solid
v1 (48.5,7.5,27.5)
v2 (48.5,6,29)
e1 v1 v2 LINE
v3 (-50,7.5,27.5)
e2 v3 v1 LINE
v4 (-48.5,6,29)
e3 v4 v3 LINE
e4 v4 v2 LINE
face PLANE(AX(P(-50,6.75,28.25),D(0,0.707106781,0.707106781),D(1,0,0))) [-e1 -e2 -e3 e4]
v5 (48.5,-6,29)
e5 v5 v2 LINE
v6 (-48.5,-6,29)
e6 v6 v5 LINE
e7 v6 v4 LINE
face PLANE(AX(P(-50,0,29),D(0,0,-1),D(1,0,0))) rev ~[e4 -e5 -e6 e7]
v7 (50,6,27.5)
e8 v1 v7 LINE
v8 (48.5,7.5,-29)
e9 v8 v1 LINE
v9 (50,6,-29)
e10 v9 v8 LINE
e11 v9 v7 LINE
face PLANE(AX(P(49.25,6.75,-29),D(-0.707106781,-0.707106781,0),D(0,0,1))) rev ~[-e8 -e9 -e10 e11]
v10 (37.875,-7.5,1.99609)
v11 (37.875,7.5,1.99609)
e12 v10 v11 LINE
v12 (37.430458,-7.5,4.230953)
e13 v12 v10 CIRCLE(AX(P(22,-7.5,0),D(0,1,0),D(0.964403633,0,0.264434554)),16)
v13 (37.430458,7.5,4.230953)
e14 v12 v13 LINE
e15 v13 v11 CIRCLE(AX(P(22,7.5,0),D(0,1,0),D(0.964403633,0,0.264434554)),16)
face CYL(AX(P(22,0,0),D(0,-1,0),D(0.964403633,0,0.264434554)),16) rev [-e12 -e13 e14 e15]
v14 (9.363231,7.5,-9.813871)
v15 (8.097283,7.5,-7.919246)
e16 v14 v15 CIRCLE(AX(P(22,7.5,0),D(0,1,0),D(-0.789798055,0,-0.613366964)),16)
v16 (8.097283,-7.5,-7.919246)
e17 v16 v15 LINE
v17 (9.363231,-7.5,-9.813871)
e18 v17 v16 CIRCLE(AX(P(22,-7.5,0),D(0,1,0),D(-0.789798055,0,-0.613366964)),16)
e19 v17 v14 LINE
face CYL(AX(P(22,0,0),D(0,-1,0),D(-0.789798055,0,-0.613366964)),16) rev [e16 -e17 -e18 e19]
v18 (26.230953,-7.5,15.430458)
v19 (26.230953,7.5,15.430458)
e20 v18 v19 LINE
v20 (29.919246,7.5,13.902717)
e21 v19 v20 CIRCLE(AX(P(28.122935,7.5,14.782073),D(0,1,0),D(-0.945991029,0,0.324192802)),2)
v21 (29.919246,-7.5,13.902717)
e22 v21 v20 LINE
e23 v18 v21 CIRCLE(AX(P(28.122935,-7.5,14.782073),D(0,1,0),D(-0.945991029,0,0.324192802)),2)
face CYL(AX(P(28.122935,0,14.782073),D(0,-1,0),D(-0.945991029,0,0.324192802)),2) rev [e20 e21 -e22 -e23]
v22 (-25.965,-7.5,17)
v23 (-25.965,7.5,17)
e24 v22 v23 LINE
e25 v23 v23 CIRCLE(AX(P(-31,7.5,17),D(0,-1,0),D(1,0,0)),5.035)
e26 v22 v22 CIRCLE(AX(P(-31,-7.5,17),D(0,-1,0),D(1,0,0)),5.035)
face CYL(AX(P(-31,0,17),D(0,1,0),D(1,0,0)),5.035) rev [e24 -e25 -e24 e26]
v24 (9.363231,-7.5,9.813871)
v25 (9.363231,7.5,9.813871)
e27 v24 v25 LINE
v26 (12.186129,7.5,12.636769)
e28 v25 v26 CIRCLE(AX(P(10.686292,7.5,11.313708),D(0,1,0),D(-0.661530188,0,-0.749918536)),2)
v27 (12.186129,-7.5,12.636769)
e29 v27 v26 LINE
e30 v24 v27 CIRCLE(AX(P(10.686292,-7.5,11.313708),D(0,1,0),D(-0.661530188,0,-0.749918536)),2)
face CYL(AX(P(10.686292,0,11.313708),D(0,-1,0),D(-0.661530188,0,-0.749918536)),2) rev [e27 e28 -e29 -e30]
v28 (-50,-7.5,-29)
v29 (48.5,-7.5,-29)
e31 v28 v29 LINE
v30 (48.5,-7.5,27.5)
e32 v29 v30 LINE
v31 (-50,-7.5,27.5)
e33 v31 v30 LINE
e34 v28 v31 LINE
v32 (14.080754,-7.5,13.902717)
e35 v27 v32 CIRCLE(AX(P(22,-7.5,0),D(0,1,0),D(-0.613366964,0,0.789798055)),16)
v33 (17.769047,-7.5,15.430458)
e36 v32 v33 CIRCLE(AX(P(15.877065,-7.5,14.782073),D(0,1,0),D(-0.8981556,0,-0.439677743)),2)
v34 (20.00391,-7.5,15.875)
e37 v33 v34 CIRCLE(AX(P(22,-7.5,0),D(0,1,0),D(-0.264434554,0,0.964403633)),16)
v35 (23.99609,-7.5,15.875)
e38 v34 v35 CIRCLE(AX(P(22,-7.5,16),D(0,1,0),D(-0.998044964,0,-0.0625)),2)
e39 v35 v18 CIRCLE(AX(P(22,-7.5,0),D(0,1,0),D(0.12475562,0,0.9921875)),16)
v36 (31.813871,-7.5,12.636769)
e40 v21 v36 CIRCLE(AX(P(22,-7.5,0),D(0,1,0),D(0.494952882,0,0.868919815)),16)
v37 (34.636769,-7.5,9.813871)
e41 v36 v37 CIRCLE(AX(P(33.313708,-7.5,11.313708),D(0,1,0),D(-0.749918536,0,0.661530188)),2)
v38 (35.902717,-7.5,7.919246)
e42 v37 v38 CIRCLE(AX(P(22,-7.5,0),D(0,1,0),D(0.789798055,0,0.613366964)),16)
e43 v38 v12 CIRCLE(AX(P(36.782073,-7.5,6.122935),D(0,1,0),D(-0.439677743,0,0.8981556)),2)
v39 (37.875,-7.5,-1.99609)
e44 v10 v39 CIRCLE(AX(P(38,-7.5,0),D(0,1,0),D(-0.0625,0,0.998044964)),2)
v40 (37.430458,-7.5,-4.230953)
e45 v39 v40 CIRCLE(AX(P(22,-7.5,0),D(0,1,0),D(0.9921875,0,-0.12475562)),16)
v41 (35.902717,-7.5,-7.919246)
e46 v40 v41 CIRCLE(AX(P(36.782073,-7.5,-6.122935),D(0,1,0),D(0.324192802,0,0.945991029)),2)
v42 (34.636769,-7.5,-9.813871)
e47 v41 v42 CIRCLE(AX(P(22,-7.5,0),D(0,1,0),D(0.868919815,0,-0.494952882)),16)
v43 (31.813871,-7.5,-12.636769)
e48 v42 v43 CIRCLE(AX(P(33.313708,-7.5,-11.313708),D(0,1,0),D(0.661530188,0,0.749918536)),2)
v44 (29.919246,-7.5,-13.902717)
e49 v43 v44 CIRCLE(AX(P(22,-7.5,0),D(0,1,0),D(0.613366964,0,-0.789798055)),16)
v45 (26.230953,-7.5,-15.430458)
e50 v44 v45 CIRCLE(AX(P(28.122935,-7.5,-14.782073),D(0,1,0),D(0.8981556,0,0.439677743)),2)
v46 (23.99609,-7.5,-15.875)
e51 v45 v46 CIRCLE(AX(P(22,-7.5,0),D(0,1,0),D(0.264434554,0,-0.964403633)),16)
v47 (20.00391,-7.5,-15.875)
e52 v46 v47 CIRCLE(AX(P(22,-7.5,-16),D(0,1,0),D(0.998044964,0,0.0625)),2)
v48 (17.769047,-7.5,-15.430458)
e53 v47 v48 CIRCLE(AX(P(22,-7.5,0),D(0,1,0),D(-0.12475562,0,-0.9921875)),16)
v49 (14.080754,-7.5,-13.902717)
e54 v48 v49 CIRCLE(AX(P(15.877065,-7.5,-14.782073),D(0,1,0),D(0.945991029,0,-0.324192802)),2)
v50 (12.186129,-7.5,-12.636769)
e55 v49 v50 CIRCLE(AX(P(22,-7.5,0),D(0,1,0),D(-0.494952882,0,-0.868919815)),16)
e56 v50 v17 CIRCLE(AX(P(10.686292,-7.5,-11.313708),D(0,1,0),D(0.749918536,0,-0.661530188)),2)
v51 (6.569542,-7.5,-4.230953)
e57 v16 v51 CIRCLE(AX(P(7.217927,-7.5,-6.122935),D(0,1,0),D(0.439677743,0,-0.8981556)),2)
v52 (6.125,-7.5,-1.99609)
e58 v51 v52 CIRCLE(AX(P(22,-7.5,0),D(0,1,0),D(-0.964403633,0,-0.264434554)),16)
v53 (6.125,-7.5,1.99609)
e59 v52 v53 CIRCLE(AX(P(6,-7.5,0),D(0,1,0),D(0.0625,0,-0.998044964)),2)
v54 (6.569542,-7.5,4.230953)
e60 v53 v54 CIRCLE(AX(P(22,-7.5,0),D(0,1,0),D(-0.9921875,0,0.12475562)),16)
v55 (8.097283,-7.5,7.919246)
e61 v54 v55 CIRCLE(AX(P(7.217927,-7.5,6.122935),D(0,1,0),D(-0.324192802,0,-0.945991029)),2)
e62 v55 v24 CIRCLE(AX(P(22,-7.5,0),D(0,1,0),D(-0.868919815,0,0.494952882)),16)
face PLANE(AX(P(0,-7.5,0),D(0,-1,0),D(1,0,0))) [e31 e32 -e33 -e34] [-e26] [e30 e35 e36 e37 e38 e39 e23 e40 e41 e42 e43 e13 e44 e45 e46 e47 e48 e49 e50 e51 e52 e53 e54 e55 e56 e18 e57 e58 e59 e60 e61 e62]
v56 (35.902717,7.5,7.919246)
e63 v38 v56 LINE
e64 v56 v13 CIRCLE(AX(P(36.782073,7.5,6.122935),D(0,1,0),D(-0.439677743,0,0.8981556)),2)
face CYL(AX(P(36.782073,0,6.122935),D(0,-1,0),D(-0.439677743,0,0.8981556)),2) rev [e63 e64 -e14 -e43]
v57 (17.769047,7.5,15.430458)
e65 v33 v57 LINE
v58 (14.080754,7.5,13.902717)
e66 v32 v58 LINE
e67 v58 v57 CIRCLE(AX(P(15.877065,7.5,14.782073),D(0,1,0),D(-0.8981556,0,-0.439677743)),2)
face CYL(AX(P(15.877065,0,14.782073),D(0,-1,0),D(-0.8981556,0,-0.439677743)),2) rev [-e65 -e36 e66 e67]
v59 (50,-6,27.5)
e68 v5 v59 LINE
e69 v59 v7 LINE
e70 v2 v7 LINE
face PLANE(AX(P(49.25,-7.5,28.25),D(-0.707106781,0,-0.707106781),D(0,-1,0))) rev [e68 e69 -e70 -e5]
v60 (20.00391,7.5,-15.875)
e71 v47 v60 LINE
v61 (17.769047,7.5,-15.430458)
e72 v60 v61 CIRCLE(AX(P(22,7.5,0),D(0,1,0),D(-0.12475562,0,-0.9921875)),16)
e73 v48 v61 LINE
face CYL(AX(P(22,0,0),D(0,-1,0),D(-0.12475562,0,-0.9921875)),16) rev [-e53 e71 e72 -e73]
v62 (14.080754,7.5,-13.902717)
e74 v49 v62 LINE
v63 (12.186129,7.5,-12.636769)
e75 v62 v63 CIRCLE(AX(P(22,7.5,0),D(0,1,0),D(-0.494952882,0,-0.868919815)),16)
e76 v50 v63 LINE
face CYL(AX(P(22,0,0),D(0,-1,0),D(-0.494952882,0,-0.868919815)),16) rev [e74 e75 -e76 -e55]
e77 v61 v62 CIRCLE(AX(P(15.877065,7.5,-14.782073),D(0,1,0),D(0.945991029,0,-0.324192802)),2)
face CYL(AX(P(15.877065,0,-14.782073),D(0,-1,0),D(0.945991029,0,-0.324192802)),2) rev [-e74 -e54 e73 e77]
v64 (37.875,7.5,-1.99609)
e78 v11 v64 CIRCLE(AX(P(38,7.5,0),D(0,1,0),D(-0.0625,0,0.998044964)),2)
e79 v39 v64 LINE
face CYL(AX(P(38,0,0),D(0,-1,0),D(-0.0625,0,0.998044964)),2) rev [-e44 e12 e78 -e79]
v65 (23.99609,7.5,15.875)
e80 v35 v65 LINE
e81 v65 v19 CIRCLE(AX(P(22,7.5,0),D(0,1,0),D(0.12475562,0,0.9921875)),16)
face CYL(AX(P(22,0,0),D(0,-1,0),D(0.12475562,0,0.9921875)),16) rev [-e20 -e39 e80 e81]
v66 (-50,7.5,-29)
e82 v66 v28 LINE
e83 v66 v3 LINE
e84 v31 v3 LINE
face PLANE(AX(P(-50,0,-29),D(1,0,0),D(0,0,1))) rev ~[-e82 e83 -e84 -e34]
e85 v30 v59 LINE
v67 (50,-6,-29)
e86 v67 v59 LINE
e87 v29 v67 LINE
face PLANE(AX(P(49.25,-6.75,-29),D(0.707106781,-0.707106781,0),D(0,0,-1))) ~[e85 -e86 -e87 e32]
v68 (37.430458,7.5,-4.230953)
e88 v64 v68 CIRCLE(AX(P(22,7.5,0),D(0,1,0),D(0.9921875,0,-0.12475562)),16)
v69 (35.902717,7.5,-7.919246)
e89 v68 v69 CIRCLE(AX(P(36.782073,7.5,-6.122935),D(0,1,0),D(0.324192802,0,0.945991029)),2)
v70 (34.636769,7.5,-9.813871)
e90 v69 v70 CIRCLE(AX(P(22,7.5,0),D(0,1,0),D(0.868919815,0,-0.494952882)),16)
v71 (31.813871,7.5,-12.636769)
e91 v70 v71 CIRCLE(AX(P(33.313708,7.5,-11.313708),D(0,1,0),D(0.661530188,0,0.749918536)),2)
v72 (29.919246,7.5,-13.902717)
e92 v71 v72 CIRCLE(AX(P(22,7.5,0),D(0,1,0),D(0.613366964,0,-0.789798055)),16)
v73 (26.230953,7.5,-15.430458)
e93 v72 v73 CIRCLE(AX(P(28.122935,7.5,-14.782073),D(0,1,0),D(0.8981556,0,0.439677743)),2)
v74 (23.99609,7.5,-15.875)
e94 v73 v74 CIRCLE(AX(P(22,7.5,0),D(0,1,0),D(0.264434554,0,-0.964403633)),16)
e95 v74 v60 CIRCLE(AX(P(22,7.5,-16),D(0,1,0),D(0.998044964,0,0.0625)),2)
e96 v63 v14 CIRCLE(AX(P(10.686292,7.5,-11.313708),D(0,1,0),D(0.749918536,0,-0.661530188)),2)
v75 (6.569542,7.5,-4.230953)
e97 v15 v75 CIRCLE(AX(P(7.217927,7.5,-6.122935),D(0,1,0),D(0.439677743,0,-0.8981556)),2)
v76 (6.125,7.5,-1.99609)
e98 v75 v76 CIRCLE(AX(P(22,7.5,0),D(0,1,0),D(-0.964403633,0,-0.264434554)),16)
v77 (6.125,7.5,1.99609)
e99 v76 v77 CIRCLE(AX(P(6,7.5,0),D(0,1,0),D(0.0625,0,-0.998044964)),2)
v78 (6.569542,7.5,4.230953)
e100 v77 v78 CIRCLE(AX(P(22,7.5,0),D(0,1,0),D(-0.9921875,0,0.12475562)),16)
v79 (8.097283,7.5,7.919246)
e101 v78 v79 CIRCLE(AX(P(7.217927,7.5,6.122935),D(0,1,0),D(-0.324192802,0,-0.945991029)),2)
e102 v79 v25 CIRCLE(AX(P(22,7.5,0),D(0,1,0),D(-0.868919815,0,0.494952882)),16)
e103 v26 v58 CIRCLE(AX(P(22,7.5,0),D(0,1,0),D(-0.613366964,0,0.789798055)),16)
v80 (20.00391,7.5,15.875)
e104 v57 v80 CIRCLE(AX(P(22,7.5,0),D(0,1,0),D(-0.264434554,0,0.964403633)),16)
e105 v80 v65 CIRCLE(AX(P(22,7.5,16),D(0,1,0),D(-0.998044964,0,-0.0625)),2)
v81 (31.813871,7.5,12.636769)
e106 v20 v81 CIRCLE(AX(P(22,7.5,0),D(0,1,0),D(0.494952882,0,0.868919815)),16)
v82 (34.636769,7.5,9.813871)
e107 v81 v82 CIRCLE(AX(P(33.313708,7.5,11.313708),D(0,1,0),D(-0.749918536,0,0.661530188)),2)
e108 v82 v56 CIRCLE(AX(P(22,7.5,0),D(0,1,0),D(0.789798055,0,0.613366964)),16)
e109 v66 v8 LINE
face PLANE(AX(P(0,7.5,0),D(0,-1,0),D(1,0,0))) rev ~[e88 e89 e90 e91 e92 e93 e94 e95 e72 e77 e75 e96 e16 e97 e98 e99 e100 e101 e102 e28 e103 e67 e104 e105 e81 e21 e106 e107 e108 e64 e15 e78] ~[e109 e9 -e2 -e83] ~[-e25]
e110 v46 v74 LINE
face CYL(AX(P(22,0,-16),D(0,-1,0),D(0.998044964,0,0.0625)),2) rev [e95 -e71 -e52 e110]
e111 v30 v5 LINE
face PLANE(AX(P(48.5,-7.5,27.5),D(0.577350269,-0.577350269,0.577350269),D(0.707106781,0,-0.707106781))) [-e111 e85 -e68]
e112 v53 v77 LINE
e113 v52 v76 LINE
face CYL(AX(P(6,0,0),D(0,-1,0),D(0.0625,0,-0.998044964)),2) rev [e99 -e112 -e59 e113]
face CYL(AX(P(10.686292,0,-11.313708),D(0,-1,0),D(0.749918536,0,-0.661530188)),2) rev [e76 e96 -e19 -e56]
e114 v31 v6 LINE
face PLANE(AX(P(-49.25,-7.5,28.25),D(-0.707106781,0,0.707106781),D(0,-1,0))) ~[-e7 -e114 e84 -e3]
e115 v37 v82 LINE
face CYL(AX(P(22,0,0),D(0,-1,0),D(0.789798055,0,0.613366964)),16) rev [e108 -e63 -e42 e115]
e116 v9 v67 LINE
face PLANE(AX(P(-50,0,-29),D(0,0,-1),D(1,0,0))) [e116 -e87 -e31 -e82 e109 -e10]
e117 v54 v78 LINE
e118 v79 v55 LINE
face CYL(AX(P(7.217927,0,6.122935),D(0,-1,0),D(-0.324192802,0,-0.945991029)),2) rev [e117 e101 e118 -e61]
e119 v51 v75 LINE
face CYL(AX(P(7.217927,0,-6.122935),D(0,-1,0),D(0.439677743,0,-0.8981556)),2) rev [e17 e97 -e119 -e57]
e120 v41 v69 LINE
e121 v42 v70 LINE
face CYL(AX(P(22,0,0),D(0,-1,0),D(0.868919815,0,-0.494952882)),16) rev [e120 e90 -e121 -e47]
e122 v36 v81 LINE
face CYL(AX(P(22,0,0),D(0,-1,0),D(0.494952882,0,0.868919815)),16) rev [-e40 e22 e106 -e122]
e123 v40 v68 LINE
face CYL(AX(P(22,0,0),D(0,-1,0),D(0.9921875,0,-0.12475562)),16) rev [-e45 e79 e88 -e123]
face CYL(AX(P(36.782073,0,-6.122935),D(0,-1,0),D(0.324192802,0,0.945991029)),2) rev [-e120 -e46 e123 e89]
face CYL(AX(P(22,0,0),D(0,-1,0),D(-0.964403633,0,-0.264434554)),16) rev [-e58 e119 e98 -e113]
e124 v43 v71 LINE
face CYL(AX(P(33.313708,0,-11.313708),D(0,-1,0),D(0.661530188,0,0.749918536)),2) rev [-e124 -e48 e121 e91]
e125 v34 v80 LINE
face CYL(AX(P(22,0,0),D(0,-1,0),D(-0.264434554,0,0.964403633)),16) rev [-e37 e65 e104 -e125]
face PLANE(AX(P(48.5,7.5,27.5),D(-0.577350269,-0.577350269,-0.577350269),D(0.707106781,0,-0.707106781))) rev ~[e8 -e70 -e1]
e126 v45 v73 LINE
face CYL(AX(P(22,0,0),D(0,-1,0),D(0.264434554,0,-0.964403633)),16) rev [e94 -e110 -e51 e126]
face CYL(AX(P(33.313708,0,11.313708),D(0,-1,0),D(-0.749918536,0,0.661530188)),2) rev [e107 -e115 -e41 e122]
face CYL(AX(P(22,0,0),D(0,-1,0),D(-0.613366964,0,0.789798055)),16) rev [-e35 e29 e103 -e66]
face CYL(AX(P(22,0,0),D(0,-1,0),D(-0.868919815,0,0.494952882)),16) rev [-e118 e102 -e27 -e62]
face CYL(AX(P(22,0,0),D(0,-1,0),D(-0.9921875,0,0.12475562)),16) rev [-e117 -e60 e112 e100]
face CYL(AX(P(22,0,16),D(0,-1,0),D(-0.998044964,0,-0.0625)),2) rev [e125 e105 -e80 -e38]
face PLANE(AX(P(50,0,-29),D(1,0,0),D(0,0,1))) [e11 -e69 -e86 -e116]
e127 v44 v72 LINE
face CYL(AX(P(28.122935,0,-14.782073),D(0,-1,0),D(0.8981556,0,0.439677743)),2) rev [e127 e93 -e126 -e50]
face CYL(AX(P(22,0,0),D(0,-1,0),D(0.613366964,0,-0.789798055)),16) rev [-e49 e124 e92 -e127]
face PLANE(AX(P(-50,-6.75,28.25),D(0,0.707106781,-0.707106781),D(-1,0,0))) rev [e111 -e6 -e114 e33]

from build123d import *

# Parameters (mm, degrees)
F0_W     = 100
F0_H     = 58
F0_R     = 5.035
F1_DEPTH = 7.5
F2_SIZE  = 1.5


with BuildPart() as f1:
    # F0 (on Front) → F1 (new body, symmetric)
    with BuildSketch(Plane.XZ):
        Rectangle(F0_W, F0_H)
        with Locations((-31, 17)):
            Circle(F0_R, mode=Mode.SUBTRACT)
        with BuildLine():
            ThreePointArc((8.0972829663, 7.9192461182), (8.6964862032, 8.8891237283), (9.3632311248, 9.8138714275))
            ThreePointArc((9.3632311248, 9.8138714275), (9.2720779386, 12.7279220614), (12.1861285725, 12.6367688752))
            ThreePointArc((12.1861285725, 12.6367688752), (13.1108762717, 13.3035137968), (14.0807538818, 13.9027170337))
            ThreePointArc((14.0807538818, 13.9027170337), (15.1116982174, 16.6298315852), (17.7690471406, 15.4304581235))
            ThreePointArc((17.7690471406, 15.4304581235), (18.8785548477, 15.6925644865), (20.0039100722, 15.875))
            ThreePointArc((20.0039100722, 15.875), (22, 18), (23.9960899278, 15.875))
            ThreePointArc((23.9960899278, 15.875), (25.1214451523, 15.6925644865), (26.2309528594, 15.4304581235))
            ThreePointArc((26.2309528594, 15.4304581235), (28.8883017826, 16.6298315852), (29.9192461182, 13.9027170337))
            ThreePointArc((29.9192461182, 13.9027170337), (30.8891237283, 13.3035137968), (31.8138714275, 12.6367688752))
            ThreePointArc((31.8138714275, 12.6367688752), (34.7279220614, 12.7279220614), (34.6367688752, 9.8138714275))
            ThreePointArc((34.6367688752, 9.8138714275), (35.3035137968, 8.8891237283), (35.9027170337, 7.9192461182))
            ThreePointArc((35.9027170337, 7.9192461182), (38.6298315852, 6.8883017826), (37.4304581235, 4.2309528594))
            ThreePointArc((37.4304581235, 4.2309528594), (37.6925644865, 3.1214451523), (37.875, 1.9960899278))
            ThreePointArc((37.875, 1.9960899278), (40, 0), (37.875, -1.9960899278))
            ThreePointArc((37.875, -1.9960899278), (37.6925644865, -3.1214451523), (37.4304581235, -4.2309528594))
            ThreePointArc((37.4304581235, -4.2309528594), (38.6298315852, -6.8883017826), (35.9027170337, -7.9192461182))
            ThreePointArc((35.9027170337, -7.9192461182), (35.3035137968, -8.8891237283), (34.6367688752, -9.8138714275))
            ThreePointArc((34.6367688752, -9.8138714275), (34.7279220614, -12.7279220614), (31.8138714275, -12.6367688752))
            ThreePointArc((31.8138714275, -12.6367688752), (30.8891237283, -13.3035137968), (29.9192461182, -13.9027170337))
            ThreePointArc((29.9192461182, -13.9027170337), (28.8883017826, -16.6298315852), (26.2309528594, -15.4304581235))
            ThreePointArc((26.2309528594, -15.4304581235), (25.1214451523, -15.6925644865), (23.9960899278, -15.875))
            ThreePointArc((23.9960899278, -15.875), (22, -18), (20.0039100722, -15.875))
            ThreePointArc((20.0039100722, -15.875), (18.8785548477, -15.6925644865), (17.7690471406, -15.4304581235))
            ThreePointArc((17.7690471406, -15.4304581235), (15.1116982174, -16.6298315852), (14.0807538818, -13.9027170337))
            ThreePointArc((14.0807538818, -13.9027170337), (13.1108762717, -13.3035137968), (12.1861285725, -12.6367688752))
            ThreePointArc((12.1861285725, -12.6367688752), (9.2720779386, -12.7279220614), (9.3632311248, -9.8138714275))
            ThreePointArc((9.3632311248, -9.8138714275), (8.6964862032, -8.8891237283), (8.0972829663, -7.9192461182))
            ThreePointArc((8.0972829663, -7.9192461182), (5.3701684148, -6.8883017826), (6.5695418765, -4.2309528594))
            ThreePointArc((6.5695418765, -4.2309528594), (6.3074355135, -3.1214451523), (6.125, -1.9960899278))
            ThreePointArc((6.125, -1.9960899278), (4, 0), (6.125, 1.9960899278))
            ThreePointArc((6.125, 1.9960899278), (6.3074355135, 3.1214451523), (6.5695418765, 4.2309528594))
            ThreePointArc((6.5695418765, 4.2309528594), (5.3701684148, 6.8883017826), (8.0972829663, 7.9192461182))
        make_face(mode=Mode.SUBTRACT)
    extrude(amount=F1_DEPTH, both=True)

    # F2
    f2_edges = [f1.edges().sort_by_distance(p)[0] for p in [
        (50, 0, 29),
        (0, 7.5, 29),
        (0, -7.5, 29),
        (50, -7.5, 0),
        (50, 7.5, 0),
        (-50, 0, 29),
    ]]
    chamfer(f2_edges, length=F2_SIZE)


solid = f1.part
